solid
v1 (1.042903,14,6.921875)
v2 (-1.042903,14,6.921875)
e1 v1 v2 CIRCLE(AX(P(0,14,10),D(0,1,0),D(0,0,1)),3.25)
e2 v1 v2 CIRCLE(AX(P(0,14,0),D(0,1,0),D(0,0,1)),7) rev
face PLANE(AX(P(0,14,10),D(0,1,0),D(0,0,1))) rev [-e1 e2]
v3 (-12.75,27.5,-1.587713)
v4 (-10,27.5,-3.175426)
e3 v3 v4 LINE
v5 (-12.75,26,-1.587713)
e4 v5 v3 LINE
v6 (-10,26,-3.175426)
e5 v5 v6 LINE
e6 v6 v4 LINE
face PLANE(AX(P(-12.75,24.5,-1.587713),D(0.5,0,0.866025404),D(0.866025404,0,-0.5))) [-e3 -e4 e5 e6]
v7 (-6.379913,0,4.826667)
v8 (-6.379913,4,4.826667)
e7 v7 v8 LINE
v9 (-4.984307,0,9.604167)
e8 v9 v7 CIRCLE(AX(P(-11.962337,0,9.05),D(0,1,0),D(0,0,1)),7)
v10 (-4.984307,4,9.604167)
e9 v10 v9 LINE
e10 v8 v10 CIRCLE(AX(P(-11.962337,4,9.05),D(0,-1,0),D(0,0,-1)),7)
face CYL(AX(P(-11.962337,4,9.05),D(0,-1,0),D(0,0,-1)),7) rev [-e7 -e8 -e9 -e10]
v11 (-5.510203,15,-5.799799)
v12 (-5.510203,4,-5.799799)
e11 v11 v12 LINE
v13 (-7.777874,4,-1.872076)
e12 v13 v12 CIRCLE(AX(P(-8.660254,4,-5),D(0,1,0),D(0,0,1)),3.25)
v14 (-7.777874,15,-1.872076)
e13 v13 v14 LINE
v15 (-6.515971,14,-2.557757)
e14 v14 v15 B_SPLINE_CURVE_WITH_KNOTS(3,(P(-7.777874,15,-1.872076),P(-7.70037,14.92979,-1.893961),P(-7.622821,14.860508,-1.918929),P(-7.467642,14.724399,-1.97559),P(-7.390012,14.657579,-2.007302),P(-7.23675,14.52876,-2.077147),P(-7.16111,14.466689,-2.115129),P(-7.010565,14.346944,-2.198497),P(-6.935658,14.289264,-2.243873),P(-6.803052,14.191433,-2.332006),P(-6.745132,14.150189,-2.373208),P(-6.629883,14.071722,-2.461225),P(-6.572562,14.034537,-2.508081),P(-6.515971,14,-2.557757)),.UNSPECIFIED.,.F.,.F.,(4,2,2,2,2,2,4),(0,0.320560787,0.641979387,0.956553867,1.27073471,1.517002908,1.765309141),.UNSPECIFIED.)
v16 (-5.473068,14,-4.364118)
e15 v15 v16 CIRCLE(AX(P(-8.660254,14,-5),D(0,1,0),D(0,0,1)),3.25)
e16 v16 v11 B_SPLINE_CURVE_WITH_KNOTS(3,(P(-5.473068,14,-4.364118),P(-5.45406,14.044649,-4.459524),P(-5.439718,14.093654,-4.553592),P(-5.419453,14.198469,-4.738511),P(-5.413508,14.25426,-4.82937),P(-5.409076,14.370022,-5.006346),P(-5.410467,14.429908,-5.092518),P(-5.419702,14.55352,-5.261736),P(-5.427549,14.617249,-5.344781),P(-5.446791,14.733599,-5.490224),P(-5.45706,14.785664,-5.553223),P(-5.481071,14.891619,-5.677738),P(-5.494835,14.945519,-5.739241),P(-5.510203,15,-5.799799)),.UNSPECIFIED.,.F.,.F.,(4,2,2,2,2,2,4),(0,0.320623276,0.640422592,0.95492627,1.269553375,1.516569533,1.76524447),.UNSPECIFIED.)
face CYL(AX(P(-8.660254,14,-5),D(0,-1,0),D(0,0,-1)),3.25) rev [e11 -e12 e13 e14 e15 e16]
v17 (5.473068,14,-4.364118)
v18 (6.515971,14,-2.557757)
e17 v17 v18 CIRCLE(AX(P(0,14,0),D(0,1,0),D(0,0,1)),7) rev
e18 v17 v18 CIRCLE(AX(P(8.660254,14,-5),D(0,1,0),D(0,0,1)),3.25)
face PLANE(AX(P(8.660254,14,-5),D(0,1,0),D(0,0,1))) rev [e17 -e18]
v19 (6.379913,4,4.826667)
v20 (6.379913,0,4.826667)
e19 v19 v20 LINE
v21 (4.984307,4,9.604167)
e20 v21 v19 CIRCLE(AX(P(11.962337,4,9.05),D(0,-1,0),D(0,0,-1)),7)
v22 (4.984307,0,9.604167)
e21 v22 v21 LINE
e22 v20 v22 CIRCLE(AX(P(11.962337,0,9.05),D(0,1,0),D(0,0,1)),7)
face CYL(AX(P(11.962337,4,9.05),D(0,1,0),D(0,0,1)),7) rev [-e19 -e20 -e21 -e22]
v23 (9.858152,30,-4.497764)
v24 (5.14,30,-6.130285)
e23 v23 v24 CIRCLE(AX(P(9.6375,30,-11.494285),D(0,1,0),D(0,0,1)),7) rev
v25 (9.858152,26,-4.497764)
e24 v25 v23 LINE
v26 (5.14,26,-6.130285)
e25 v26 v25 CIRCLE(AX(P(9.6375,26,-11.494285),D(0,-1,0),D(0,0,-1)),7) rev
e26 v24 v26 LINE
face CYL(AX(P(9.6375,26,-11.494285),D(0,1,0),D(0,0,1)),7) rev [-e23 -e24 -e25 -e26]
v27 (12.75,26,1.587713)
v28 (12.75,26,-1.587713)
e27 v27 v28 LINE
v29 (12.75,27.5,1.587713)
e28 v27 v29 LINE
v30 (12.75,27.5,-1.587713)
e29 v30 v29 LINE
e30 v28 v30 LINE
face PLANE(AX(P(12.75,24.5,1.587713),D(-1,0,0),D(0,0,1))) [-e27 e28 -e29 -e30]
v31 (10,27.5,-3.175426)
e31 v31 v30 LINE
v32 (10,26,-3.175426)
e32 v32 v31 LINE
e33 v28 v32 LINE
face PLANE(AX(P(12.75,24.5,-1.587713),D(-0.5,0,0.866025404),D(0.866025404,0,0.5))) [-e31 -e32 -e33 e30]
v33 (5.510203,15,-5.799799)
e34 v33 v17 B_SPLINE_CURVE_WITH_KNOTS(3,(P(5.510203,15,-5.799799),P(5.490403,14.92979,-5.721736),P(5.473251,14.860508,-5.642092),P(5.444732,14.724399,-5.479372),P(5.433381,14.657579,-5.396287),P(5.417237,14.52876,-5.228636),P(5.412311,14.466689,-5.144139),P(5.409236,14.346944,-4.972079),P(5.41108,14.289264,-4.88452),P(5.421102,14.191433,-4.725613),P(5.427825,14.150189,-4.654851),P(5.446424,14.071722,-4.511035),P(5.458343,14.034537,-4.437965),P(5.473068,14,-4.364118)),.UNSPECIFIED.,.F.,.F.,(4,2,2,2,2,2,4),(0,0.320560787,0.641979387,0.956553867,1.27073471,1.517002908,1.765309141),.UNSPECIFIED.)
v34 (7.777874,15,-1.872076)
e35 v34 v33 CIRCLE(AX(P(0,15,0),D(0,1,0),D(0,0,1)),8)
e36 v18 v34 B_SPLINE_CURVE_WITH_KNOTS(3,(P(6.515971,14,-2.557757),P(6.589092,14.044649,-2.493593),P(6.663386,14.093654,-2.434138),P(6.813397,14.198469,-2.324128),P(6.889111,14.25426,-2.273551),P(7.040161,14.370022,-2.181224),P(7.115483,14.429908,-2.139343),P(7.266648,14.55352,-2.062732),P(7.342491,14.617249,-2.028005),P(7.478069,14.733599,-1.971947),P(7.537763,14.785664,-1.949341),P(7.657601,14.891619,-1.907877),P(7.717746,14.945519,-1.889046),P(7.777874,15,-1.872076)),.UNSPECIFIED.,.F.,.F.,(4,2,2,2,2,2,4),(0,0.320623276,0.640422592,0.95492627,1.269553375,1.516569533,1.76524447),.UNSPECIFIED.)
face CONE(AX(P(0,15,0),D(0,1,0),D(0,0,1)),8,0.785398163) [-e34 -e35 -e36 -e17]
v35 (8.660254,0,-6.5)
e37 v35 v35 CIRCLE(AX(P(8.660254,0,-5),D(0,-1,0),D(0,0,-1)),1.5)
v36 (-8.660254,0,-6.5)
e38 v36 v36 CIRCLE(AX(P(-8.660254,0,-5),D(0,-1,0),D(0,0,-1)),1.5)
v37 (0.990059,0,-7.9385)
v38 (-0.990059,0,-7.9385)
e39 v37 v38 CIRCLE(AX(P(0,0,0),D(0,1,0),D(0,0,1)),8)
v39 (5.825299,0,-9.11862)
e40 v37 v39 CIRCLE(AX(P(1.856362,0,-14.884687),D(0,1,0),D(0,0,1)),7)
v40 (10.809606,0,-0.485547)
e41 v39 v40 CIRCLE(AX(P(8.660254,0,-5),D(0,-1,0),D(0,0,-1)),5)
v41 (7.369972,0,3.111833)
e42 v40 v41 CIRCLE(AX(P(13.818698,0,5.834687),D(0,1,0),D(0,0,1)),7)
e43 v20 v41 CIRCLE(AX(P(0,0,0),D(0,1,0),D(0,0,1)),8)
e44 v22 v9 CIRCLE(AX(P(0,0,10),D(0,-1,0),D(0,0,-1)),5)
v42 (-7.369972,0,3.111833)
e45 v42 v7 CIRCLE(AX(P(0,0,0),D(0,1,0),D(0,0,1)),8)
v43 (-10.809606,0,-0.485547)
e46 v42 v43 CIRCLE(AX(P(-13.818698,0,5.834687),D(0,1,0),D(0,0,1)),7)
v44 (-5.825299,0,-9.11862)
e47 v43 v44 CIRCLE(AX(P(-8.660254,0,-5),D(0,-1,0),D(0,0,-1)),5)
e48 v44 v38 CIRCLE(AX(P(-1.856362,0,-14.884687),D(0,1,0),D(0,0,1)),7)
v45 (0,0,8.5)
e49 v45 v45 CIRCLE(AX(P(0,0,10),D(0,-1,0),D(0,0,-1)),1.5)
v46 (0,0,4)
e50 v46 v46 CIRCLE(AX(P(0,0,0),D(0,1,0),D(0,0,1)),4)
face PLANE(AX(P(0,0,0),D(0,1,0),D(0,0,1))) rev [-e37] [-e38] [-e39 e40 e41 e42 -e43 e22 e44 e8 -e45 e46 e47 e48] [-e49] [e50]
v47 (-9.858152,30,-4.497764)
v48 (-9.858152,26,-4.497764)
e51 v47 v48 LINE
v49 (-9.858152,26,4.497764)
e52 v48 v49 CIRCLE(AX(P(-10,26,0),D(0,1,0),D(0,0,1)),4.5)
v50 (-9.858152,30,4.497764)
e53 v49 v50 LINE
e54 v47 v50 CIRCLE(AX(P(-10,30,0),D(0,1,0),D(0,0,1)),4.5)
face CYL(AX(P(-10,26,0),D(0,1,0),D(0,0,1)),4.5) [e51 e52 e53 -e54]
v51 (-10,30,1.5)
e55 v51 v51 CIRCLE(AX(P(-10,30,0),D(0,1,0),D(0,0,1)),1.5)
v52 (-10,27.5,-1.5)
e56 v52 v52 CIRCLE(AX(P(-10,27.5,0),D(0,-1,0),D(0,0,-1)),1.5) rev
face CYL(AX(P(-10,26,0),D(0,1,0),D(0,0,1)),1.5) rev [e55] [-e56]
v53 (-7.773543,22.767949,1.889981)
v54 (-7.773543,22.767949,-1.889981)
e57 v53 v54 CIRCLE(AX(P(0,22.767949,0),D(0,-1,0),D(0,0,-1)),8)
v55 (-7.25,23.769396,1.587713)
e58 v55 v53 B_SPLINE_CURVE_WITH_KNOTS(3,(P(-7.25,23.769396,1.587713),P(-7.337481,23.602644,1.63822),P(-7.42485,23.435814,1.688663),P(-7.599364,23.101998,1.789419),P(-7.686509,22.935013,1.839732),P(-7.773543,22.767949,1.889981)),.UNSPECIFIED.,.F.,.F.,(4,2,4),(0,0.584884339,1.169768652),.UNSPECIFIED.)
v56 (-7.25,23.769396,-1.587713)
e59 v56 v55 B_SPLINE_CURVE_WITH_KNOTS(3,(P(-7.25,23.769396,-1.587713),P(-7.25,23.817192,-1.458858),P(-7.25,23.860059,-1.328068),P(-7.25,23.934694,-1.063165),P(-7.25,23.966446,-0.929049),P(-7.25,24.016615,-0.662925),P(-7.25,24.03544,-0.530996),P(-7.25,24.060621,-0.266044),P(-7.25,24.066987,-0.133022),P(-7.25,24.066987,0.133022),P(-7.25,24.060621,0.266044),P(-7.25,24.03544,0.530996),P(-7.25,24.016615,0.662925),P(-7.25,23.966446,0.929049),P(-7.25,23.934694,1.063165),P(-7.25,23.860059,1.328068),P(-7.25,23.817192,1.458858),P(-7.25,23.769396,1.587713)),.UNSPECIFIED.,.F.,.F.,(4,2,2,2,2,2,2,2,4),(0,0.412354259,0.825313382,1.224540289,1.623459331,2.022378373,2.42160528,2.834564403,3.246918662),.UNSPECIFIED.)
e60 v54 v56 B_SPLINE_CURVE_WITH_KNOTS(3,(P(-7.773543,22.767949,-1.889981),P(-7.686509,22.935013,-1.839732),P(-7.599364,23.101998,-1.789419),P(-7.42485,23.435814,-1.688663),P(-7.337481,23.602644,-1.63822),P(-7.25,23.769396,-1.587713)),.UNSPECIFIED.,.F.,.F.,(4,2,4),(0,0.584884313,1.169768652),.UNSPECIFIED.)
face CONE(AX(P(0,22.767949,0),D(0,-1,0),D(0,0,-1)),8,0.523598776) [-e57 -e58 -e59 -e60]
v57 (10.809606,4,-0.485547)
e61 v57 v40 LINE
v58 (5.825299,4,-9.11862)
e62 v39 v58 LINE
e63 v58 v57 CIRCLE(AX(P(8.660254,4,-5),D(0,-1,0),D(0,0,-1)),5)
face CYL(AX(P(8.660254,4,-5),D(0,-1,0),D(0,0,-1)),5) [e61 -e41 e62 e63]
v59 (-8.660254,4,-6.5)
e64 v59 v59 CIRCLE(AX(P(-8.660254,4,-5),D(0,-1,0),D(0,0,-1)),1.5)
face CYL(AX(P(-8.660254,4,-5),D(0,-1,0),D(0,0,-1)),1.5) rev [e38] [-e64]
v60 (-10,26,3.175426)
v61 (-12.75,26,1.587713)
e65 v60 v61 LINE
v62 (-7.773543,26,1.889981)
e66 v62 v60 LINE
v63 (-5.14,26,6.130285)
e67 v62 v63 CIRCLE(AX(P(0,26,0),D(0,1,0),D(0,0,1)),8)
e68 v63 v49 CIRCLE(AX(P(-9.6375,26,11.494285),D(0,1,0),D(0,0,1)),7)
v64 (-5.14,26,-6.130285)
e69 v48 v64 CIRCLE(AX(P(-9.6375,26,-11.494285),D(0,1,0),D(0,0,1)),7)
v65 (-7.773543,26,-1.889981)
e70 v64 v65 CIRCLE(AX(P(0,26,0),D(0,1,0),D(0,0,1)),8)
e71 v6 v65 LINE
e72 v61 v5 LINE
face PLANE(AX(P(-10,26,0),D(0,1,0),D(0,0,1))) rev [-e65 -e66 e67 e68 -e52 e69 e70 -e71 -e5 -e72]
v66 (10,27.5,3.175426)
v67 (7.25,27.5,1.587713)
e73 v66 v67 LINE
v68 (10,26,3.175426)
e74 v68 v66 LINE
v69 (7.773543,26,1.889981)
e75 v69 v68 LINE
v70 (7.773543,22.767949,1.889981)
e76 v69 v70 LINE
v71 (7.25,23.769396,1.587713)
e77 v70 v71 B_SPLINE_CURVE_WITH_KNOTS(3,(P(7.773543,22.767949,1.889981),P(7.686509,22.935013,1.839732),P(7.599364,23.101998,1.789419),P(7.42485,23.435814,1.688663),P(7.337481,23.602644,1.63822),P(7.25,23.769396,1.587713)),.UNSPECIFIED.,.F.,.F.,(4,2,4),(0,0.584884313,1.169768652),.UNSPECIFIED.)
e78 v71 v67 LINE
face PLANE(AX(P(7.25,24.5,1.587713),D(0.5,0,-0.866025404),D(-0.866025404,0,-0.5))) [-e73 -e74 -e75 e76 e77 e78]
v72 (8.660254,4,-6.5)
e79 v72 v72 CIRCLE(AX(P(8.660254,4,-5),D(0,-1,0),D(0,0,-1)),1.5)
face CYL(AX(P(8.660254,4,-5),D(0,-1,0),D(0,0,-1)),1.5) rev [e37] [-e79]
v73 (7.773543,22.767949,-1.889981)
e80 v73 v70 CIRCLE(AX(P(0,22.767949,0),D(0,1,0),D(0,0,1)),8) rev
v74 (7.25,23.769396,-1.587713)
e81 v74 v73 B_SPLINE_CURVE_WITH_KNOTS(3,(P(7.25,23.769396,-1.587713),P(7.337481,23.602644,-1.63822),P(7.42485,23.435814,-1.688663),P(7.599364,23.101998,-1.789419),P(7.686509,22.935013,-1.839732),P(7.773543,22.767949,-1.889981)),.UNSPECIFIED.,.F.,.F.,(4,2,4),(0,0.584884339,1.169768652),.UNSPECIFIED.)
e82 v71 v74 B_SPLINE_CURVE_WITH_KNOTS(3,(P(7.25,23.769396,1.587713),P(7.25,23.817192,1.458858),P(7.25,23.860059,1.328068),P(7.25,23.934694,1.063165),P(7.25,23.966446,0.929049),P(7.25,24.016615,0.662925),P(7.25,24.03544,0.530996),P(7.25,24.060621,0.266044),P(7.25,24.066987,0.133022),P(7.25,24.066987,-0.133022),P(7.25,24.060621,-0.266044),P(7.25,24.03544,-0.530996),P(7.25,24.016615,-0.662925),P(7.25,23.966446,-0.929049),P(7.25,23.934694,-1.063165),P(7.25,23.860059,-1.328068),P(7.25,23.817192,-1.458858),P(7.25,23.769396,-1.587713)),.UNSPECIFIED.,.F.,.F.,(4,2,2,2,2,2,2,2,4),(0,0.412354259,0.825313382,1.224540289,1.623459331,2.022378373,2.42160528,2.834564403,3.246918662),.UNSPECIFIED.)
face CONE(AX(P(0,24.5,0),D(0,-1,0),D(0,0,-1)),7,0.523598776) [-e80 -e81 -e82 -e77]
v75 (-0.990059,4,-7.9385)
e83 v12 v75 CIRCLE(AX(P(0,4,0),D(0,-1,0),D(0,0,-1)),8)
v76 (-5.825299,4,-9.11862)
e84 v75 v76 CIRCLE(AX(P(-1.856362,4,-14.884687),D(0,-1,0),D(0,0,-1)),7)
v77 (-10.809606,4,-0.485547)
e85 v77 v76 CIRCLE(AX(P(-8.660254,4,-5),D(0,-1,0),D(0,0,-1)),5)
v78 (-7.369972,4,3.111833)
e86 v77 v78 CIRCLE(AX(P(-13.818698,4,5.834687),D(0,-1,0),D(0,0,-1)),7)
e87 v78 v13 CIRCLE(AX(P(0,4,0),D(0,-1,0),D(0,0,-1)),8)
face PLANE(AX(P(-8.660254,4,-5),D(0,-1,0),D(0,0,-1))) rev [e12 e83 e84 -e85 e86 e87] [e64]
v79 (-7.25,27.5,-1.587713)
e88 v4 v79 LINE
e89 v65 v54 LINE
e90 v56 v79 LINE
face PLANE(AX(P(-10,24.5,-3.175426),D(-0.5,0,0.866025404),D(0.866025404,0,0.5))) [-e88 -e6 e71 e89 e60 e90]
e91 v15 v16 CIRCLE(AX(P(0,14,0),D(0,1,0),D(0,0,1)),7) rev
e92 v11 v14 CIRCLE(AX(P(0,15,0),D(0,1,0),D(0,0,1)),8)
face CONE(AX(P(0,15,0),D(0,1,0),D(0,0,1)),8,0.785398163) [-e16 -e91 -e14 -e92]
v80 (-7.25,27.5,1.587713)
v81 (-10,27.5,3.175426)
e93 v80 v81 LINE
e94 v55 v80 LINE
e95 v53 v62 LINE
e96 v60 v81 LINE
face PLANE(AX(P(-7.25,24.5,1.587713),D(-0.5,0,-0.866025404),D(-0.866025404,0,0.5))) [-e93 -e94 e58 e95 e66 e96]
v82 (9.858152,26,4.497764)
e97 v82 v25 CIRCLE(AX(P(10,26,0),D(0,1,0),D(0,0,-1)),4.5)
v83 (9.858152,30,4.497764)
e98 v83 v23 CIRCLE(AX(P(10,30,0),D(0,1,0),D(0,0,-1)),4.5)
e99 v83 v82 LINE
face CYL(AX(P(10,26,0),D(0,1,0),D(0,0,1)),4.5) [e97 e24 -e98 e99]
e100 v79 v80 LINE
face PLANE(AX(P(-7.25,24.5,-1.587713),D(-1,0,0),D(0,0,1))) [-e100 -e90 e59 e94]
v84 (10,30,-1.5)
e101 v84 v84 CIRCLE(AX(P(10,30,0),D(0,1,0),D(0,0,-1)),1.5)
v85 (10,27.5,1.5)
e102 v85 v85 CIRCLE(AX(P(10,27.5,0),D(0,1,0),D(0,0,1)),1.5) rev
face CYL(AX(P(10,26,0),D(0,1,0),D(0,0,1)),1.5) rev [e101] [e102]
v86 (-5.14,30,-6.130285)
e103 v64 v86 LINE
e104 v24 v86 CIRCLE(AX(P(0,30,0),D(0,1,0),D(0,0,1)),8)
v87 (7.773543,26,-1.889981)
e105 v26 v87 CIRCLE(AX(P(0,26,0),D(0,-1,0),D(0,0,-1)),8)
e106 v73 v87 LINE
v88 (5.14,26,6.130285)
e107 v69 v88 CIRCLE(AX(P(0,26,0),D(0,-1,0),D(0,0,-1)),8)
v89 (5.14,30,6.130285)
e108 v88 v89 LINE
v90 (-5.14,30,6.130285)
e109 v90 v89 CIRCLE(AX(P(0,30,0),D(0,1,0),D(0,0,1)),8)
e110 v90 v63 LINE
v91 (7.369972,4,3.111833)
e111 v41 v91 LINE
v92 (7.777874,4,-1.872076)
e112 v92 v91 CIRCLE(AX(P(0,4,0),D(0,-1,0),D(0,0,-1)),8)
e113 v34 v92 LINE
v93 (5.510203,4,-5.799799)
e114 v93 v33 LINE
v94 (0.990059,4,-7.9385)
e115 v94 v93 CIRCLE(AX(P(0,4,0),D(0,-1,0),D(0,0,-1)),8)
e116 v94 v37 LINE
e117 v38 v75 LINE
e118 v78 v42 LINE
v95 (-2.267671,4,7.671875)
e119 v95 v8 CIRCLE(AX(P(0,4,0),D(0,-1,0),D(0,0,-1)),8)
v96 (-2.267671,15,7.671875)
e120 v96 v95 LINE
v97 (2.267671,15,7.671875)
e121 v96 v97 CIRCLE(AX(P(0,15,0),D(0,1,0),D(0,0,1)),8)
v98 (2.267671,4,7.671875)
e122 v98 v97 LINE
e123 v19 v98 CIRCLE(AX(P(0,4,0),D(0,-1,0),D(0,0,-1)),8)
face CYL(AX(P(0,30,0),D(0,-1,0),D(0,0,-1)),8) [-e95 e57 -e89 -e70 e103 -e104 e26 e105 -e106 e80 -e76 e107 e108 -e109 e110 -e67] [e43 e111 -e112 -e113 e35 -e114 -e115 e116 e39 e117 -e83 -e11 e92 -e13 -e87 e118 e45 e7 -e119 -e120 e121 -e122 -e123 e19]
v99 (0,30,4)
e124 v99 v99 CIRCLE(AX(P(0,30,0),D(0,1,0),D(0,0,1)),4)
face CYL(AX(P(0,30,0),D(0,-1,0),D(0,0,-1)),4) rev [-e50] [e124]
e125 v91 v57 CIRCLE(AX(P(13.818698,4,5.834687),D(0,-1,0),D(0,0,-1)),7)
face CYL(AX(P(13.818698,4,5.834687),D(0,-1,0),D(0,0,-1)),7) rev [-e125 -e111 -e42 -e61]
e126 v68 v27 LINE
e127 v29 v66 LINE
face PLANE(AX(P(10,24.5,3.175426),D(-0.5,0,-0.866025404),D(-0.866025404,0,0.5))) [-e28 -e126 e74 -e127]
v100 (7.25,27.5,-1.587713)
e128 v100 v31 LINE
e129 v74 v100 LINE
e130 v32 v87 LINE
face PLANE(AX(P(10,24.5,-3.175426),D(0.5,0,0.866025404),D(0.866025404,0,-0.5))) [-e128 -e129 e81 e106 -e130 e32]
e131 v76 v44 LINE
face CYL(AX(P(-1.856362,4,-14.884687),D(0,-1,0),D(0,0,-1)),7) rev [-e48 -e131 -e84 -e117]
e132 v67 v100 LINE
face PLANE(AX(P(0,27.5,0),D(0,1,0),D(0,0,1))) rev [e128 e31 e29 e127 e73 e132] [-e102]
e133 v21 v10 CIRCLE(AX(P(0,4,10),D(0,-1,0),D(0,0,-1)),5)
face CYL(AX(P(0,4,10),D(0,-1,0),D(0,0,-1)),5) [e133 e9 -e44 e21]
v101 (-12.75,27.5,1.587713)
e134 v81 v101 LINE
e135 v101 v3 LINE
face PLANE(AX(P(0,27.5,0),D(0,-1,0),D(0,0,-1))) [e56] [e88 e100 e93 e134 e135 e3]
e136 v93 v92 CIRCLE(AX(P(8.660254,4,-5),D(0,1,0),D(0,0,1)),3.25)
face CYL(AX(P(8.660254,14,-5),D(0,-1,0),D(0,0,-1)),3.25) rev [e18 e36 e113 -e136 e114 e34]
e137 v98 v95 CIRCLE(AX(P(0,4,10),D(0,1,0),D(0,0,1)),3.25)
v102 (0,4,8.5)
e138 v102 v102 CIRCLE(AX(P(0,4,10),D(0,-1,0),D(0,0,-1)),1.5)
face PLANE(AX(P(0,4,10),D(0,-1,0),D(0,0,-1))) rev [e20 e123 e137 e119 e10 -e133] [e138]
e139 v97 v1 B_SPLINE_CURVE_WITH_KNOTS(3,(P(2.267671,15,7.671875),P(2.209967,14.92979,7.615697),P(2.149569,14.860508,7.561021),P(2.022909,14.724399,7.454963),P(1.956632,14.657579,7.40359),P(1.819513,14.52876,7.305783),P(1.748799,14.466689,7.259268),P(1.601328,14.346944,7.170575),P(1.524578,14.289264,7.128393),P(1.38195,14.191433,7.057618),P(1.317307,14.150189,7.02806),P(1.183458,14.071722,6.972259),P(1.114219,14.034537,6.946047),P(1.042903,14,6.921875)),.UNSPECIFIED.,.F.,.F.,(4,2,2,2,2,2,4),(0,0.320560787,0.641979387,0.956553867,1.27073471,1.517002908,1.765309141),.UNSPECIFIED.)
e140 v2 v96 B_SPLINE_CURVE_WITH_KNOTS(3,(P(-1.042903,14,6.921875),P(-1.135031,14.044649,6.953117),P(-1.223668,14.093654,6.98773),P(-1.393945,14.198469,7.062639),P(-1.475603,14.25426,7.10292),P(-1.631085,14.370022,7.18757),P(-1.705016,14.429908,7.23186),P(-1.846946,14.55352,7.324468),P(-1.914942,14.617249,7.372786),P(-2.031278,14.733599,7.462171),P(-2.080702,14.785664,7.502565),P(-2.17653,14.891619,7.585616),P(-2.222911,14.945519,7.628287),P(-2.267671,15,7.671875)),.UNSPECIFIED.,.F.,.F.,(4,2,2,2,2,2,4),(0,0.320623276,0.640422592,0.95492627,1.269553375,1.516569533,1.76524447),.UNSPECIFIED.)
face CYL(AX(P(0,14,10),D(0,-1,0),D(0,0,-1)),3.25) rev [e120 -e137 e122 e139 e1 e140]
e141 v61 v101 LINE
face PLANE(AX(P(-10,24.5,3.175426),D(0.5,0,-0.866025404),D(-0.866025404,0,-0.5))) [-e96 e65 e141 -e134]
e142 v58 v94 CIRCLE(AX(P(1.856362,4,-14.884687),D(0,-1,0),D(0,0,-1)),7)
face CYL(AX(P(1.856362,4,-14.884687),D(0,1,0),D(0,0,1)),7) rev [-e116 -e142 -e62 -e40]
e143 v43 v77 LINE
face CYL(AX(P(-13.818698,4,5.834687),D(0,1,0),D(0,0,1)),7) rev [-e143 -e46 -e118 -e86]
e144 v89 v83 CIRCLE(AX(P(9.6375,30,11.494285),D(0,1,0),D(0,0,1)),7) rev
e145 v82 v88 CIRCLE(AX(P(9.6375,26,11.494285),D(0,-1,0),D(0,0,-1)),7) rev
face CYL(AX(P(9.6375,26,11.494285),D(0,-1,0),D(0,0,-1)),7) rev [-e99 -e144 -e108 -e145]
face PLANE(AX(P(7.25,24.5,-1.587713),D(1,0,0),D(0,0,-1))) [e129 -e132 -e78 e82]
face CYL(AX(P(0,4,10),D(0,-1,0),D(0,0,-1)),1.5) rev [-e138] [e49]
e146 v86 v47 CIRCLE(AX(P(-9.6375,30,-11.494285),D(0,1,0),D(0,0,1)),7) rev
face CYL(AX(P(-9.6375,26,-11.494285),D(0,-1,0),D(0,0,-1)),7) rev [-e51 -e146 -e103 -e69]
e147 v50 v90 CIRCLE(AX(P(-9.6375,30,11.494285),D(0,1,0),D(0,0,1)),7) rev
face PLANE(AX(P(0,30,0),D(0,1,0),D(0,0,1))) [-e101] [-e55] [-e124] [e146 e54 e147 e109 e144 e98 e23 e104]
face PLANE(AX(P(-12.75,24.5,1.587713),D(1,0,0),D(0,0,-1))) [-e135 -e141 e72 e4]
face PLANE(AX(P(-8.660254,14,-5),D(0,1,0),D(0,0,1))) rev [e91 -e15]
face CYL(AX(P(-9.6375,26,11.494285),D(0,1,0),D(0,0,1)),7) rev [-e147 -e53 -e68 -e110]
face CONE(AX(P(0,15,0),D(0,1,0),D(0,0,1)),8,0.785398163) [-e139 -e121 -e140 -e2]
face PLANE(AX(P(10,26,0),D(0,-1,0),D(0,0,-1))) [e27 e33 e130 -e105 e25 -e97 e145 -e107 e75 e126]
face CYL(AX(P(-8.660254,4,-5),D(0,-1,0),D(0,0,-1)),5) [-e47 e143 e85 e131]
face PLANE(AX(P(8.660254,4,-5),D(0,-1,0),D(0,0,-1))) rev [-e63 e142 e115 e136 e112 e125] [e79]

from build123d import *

# Parameters (mm, degrees)
SKETCH1_R               = 8
SKETCH1_R_2             = 4
BOSS_EXTRUDE1_DEPTH     = 30
SKETCH2_R               = 4.5
SKETCH2_R_2             = 1.5
BOSS_EXTRUDE2_DEPTH     = 4
FILLET1_R               = 7
SKETCH3_R               = 5
SKETCH3_R_2             = 1.5
BOSS_EXTRUDE3_DEPTH     = 4
FILLET2_R               = 7
SKETCH4_R               = 3.25
CUT_EXTRUDE1_DEPTH      = 10
CHAMFER1_SIZE           = 1
CUT_EXTRUDE2_DEPTH      = 1.5
CUT_EXTRUDE2_DEPTH_BACK = 1.5
CHAMFER2_SIZE           = 1.732050808
CHAMFER2_SIZE_2         = 1
CHAMFER3_SIZE           = 1.732050808
CHAMFER3_SIZE_2         = 1


with BuildPart() as part:
    # Sketch1 → Boss-Extrude1 (new body)
    with BuildSketch(Plane(origin=(0, 0, 0), x_dir=(1, 0, 0), z_dir=(0, 1, 0))):
        with Locations(Location((0, 0, 0), (0, 0, 270))):
            Circle(SKETCH1_R)
        with Locations(Location((0, 0, 0), (0, 0, 270))):
            Circle(SKETCH1_R_2, mode=Mode.SUBTRACT)
    extrude(amount=BOSS_EXTRUDE1_DEPTH)

    # Sketch2 → Boss-Extrude2 (add)
    # profile 1 of 2: a face of its own
    with BuildSketch(Plane(origin=(0, 30, 0), x_dir=(1, 0, 0), z_dir=(0, 1, 0))):
        with Locations((-10, 0)):
            Circle(SKETCH2_R)
        with Locations(Location((-10, 0, 0), (0, 0, 270))):
            Circle(SKETCH2_R_2, mode=Mode.SUBTRACT)
    # profile 2 of 2: a face of its own
    with BuildSketch(Plane(origin=(0, 30, 0), x_dir=(1, 0, 0), z_dir=(0, 1, 0))):
        with Locations((10, 0)):
            Circle(SKETCH2_R)
        with Locations(Location((10, 0, 0), (0, 0, 90))):
            Circle(SKETCH2_R_2, mode=Mode.SUBTRACT)
    extrude(amount=-BOSS_EXTRUDE2_DEPTH)

    # Fillet1
    fillet1_edges = [part.edges().sort_by_distance(p)[0] for p in [
        (-7.1875, 28, 3.512811374),
        (-7.1875, 28, -3.512811374),
        (7.1875, 28, -3.512811374),
        (7.1875, 28, 3.512811374),
    ]]
    fillet(fillet1_edges, radius=FILLET1_R)

    # Sketch3 → Boss-Extrude3 (add)
    # profile 1 of 3: a face of its own
    with BuildSketch(Plane.XZ):
        with Locations((0, 10)):
            Circle(SKETCH3_R)
        with Locations(Location((0, 10, 0), (0, 0, 270))):
            Circle(SKETCH3_R_2, mode=Mode.SUBTRACT)
    # profile 2 of 3: a face of its own
    with BuildSketch(Plane.XZ):
        with Locations((8.660254038, -5)):
            Circle(SKETCH3_R)
        with Locations(Location((8.660254038, -5, 0), (0, 0, 270))):
            Circle(SKETCH3_R_2, mode=Mode.SUBTRACT)
    # profile 3 of 3: a face of its own
    with BuildSketch(Plane.XZ):
        with Locations((-8.660254038, -5)):
            Circle(SKETCH3_R)
        with Locations(Location((-8.660254038, -5, 0), (0, 0, 270))):
            Circle(SKETCH3_R_2, mode=Mode.SUBTRACT)
    extrude(amount=-BOSS_EXTRUDE3_DEPTH)

    # Fillet2
    fillet2_edges = [part.edges().sort_by_distance(p)[0] for p in [
        (3.962007067, 2, 6.95),
        (-3.962007067, 2, 6.95),
        (4.037873023, 2, -6.90619877),
        (7.99988009, 2, -0.04380123),
        (-7.99988009, 2, -0.04380123),
        (-4.037873023, 2, -6.90619877),
    ]]
    fillet(fillet2_edges, radius=FILLET2_R)

    # Sketch4 → Cut-Extrude1 (cut)
    with BuildSketch(Plane(origin=(0, 4, 0), x_dir=(1, 0, 0), z_dir=(0, 1, 0))):
        with Locations((8.660254038, 5)):
            Circle(SKETCH4_R)
        with Locations((0, -10)):
            Circle(SKETCH4_R)
        with Locations((-8.660254038, 5)):
            Circle(SKETCH4_R)
    extrude(amount=CUT_EXTRUDE1_DEPTH, mode=Mode.SUBTRACT)

    # Chamfer1
    chamfer1_edges = [part.edges().sort_by_distance(p)[0] for p in [
        (-6.92820323, 14, -4),
        (1.145643924, 14, 7.917543811),
        (6.92820323, 14, -4),
    ]]
    chamfer(chamfer1_edges, length=CHAMFER1_SIZE)

    # Sketch5 → Cut-Extrude2 (cut, two sides: drawn at the far end of the back side and taken through both)
    with BuildSketch(Plane.XZ.offset(-26).offset(-CUT_EXTRUDE2_DEPTH_BACK)):
        Polygon((-10, 3.175426481), (-12.75, 1.58771324), (-12.75, -1.58771324), (-10, -3.175426481), (-7.25, -1.58771324), (-7.25, 1.58771324), align=None)
        Polygon((7.25, 1.58771324), (10, 3.175426481), (12.75, 1.58771324), (12.75, -1.58771324), (10, -3.175426481), (7.25, -1.58771324), align=None)
    extrude(amount=CUT_EXTRUDE2_DEPTH + CUT_EXTRUDE2_DEPTH_BACK, mode=Mode.SUBTRACT)

    # Chamfer2
    # the kernel refuses this chamfer: 1.732050808, 1 mm, written as the material it takes off along each edge
    with BuildSketch(Plane(origin=(0, 24.5, 0), x_dir=(-0.6976791075699221, 0, 0.7164104011392053), z_dir=(0.7164104011392053, 0, 0.6976791075699221))) as chamfer2_piece_1_section:
        Polygon((8, CHAMFER2_SIZE), (8 - CHAMFER2_SIZE_2, 0), (8, 0), align=None)
    chamfer2_piece_1 = revolve(axis=Axis((0, 24.5, 0), (0, -1, 0)), revolution_arc=91.517812411, mode=Mode.PRIVATE)
    chamfer2_piece_1 = split(chamfer2_piece_1, bisect_by=Plane(origin=(-6.887741649, 23.854160996, 1.378563284), z_dir=(-0.5000000000000001, 0, -0.8660254037844386)), keep=Keep.TOP, mode=Mode.PRIVATE)
    chamfer2_piece_1 = split(chamfer2_piece_1, bisect_by=Plane(origin=(-7.25, 23.854160996, 0), z_dir=(-1, 0, 0)), keep=Keep.TOP, mode=Mode.PRIVATE)
    chamfer2_piece_1 = split(chamfer2_piece_1, bisect_by=Plane(origin=(-6.887741649, 23.854160996, -1.378563284), z_dir=(-0.49999999999999994, 0, 0.8660254037844389)), keep=Keep.TOP, mode=Mode.PRIVATE)
    add(chamfer2_piece_1, mode=Mode.SUBTRACT)

    # Chamfer3
    # the kernel refuses this chamfer: 1.732050808, 1 mm, written as the material it takes off along each edge
    with BuildSketch(Plane(origin=(0, 24.5, 0), x_dir=(0.6976791075699224, 0, -0.7164104011392051), z_dir=(-0.7164104011392051, 0, -0.6976791075699224))) as chamfer3_piece_1_section:
        Polygon((8, CHAMFER3_SIZE), (8 - CHAMFER3_SIZE_2, 0), (8, 0), align=None)
    chamfer3_piece_1 = revolve(axis=Axis((0, 24.5, 0), (0, -1, 0)), revolution_arc=91.517812411, mode=Mode.PRIVATE)
    chamfer3_piece_1 = split(chamfer3_piece_1, bisect_by=Plane(origin=(6.887741649, 23.854160996, -1.378563284), z_dir=(0.49999999999999994, 0, 0.8660254037844389)), keep=Keep.TOP, mode=Mode.PRIVATE)
    chamfer3_piece_1 = split(chamfer3_piece_1, bisect_by=Plane(origin=(7.25, 23.854160996, 0), z_dir=(1, 0, 0)), keep=Keep.TOP, mode=Mode.PRIVATE)
    chamfer3_piece_1 = split(chamfer3_piece_1, bisect_by=Plane(origin=(6.887741649, 23.854160996, 1.378563284), z_dir=(0.5000000000000001, 0, -0.8660254037844386)), keep=Keep.TOP, mode=Mode.PRIVATE)
    add(chamfer3_piece_1, mode=Mode.SUBTRACT)


solid = part.part
